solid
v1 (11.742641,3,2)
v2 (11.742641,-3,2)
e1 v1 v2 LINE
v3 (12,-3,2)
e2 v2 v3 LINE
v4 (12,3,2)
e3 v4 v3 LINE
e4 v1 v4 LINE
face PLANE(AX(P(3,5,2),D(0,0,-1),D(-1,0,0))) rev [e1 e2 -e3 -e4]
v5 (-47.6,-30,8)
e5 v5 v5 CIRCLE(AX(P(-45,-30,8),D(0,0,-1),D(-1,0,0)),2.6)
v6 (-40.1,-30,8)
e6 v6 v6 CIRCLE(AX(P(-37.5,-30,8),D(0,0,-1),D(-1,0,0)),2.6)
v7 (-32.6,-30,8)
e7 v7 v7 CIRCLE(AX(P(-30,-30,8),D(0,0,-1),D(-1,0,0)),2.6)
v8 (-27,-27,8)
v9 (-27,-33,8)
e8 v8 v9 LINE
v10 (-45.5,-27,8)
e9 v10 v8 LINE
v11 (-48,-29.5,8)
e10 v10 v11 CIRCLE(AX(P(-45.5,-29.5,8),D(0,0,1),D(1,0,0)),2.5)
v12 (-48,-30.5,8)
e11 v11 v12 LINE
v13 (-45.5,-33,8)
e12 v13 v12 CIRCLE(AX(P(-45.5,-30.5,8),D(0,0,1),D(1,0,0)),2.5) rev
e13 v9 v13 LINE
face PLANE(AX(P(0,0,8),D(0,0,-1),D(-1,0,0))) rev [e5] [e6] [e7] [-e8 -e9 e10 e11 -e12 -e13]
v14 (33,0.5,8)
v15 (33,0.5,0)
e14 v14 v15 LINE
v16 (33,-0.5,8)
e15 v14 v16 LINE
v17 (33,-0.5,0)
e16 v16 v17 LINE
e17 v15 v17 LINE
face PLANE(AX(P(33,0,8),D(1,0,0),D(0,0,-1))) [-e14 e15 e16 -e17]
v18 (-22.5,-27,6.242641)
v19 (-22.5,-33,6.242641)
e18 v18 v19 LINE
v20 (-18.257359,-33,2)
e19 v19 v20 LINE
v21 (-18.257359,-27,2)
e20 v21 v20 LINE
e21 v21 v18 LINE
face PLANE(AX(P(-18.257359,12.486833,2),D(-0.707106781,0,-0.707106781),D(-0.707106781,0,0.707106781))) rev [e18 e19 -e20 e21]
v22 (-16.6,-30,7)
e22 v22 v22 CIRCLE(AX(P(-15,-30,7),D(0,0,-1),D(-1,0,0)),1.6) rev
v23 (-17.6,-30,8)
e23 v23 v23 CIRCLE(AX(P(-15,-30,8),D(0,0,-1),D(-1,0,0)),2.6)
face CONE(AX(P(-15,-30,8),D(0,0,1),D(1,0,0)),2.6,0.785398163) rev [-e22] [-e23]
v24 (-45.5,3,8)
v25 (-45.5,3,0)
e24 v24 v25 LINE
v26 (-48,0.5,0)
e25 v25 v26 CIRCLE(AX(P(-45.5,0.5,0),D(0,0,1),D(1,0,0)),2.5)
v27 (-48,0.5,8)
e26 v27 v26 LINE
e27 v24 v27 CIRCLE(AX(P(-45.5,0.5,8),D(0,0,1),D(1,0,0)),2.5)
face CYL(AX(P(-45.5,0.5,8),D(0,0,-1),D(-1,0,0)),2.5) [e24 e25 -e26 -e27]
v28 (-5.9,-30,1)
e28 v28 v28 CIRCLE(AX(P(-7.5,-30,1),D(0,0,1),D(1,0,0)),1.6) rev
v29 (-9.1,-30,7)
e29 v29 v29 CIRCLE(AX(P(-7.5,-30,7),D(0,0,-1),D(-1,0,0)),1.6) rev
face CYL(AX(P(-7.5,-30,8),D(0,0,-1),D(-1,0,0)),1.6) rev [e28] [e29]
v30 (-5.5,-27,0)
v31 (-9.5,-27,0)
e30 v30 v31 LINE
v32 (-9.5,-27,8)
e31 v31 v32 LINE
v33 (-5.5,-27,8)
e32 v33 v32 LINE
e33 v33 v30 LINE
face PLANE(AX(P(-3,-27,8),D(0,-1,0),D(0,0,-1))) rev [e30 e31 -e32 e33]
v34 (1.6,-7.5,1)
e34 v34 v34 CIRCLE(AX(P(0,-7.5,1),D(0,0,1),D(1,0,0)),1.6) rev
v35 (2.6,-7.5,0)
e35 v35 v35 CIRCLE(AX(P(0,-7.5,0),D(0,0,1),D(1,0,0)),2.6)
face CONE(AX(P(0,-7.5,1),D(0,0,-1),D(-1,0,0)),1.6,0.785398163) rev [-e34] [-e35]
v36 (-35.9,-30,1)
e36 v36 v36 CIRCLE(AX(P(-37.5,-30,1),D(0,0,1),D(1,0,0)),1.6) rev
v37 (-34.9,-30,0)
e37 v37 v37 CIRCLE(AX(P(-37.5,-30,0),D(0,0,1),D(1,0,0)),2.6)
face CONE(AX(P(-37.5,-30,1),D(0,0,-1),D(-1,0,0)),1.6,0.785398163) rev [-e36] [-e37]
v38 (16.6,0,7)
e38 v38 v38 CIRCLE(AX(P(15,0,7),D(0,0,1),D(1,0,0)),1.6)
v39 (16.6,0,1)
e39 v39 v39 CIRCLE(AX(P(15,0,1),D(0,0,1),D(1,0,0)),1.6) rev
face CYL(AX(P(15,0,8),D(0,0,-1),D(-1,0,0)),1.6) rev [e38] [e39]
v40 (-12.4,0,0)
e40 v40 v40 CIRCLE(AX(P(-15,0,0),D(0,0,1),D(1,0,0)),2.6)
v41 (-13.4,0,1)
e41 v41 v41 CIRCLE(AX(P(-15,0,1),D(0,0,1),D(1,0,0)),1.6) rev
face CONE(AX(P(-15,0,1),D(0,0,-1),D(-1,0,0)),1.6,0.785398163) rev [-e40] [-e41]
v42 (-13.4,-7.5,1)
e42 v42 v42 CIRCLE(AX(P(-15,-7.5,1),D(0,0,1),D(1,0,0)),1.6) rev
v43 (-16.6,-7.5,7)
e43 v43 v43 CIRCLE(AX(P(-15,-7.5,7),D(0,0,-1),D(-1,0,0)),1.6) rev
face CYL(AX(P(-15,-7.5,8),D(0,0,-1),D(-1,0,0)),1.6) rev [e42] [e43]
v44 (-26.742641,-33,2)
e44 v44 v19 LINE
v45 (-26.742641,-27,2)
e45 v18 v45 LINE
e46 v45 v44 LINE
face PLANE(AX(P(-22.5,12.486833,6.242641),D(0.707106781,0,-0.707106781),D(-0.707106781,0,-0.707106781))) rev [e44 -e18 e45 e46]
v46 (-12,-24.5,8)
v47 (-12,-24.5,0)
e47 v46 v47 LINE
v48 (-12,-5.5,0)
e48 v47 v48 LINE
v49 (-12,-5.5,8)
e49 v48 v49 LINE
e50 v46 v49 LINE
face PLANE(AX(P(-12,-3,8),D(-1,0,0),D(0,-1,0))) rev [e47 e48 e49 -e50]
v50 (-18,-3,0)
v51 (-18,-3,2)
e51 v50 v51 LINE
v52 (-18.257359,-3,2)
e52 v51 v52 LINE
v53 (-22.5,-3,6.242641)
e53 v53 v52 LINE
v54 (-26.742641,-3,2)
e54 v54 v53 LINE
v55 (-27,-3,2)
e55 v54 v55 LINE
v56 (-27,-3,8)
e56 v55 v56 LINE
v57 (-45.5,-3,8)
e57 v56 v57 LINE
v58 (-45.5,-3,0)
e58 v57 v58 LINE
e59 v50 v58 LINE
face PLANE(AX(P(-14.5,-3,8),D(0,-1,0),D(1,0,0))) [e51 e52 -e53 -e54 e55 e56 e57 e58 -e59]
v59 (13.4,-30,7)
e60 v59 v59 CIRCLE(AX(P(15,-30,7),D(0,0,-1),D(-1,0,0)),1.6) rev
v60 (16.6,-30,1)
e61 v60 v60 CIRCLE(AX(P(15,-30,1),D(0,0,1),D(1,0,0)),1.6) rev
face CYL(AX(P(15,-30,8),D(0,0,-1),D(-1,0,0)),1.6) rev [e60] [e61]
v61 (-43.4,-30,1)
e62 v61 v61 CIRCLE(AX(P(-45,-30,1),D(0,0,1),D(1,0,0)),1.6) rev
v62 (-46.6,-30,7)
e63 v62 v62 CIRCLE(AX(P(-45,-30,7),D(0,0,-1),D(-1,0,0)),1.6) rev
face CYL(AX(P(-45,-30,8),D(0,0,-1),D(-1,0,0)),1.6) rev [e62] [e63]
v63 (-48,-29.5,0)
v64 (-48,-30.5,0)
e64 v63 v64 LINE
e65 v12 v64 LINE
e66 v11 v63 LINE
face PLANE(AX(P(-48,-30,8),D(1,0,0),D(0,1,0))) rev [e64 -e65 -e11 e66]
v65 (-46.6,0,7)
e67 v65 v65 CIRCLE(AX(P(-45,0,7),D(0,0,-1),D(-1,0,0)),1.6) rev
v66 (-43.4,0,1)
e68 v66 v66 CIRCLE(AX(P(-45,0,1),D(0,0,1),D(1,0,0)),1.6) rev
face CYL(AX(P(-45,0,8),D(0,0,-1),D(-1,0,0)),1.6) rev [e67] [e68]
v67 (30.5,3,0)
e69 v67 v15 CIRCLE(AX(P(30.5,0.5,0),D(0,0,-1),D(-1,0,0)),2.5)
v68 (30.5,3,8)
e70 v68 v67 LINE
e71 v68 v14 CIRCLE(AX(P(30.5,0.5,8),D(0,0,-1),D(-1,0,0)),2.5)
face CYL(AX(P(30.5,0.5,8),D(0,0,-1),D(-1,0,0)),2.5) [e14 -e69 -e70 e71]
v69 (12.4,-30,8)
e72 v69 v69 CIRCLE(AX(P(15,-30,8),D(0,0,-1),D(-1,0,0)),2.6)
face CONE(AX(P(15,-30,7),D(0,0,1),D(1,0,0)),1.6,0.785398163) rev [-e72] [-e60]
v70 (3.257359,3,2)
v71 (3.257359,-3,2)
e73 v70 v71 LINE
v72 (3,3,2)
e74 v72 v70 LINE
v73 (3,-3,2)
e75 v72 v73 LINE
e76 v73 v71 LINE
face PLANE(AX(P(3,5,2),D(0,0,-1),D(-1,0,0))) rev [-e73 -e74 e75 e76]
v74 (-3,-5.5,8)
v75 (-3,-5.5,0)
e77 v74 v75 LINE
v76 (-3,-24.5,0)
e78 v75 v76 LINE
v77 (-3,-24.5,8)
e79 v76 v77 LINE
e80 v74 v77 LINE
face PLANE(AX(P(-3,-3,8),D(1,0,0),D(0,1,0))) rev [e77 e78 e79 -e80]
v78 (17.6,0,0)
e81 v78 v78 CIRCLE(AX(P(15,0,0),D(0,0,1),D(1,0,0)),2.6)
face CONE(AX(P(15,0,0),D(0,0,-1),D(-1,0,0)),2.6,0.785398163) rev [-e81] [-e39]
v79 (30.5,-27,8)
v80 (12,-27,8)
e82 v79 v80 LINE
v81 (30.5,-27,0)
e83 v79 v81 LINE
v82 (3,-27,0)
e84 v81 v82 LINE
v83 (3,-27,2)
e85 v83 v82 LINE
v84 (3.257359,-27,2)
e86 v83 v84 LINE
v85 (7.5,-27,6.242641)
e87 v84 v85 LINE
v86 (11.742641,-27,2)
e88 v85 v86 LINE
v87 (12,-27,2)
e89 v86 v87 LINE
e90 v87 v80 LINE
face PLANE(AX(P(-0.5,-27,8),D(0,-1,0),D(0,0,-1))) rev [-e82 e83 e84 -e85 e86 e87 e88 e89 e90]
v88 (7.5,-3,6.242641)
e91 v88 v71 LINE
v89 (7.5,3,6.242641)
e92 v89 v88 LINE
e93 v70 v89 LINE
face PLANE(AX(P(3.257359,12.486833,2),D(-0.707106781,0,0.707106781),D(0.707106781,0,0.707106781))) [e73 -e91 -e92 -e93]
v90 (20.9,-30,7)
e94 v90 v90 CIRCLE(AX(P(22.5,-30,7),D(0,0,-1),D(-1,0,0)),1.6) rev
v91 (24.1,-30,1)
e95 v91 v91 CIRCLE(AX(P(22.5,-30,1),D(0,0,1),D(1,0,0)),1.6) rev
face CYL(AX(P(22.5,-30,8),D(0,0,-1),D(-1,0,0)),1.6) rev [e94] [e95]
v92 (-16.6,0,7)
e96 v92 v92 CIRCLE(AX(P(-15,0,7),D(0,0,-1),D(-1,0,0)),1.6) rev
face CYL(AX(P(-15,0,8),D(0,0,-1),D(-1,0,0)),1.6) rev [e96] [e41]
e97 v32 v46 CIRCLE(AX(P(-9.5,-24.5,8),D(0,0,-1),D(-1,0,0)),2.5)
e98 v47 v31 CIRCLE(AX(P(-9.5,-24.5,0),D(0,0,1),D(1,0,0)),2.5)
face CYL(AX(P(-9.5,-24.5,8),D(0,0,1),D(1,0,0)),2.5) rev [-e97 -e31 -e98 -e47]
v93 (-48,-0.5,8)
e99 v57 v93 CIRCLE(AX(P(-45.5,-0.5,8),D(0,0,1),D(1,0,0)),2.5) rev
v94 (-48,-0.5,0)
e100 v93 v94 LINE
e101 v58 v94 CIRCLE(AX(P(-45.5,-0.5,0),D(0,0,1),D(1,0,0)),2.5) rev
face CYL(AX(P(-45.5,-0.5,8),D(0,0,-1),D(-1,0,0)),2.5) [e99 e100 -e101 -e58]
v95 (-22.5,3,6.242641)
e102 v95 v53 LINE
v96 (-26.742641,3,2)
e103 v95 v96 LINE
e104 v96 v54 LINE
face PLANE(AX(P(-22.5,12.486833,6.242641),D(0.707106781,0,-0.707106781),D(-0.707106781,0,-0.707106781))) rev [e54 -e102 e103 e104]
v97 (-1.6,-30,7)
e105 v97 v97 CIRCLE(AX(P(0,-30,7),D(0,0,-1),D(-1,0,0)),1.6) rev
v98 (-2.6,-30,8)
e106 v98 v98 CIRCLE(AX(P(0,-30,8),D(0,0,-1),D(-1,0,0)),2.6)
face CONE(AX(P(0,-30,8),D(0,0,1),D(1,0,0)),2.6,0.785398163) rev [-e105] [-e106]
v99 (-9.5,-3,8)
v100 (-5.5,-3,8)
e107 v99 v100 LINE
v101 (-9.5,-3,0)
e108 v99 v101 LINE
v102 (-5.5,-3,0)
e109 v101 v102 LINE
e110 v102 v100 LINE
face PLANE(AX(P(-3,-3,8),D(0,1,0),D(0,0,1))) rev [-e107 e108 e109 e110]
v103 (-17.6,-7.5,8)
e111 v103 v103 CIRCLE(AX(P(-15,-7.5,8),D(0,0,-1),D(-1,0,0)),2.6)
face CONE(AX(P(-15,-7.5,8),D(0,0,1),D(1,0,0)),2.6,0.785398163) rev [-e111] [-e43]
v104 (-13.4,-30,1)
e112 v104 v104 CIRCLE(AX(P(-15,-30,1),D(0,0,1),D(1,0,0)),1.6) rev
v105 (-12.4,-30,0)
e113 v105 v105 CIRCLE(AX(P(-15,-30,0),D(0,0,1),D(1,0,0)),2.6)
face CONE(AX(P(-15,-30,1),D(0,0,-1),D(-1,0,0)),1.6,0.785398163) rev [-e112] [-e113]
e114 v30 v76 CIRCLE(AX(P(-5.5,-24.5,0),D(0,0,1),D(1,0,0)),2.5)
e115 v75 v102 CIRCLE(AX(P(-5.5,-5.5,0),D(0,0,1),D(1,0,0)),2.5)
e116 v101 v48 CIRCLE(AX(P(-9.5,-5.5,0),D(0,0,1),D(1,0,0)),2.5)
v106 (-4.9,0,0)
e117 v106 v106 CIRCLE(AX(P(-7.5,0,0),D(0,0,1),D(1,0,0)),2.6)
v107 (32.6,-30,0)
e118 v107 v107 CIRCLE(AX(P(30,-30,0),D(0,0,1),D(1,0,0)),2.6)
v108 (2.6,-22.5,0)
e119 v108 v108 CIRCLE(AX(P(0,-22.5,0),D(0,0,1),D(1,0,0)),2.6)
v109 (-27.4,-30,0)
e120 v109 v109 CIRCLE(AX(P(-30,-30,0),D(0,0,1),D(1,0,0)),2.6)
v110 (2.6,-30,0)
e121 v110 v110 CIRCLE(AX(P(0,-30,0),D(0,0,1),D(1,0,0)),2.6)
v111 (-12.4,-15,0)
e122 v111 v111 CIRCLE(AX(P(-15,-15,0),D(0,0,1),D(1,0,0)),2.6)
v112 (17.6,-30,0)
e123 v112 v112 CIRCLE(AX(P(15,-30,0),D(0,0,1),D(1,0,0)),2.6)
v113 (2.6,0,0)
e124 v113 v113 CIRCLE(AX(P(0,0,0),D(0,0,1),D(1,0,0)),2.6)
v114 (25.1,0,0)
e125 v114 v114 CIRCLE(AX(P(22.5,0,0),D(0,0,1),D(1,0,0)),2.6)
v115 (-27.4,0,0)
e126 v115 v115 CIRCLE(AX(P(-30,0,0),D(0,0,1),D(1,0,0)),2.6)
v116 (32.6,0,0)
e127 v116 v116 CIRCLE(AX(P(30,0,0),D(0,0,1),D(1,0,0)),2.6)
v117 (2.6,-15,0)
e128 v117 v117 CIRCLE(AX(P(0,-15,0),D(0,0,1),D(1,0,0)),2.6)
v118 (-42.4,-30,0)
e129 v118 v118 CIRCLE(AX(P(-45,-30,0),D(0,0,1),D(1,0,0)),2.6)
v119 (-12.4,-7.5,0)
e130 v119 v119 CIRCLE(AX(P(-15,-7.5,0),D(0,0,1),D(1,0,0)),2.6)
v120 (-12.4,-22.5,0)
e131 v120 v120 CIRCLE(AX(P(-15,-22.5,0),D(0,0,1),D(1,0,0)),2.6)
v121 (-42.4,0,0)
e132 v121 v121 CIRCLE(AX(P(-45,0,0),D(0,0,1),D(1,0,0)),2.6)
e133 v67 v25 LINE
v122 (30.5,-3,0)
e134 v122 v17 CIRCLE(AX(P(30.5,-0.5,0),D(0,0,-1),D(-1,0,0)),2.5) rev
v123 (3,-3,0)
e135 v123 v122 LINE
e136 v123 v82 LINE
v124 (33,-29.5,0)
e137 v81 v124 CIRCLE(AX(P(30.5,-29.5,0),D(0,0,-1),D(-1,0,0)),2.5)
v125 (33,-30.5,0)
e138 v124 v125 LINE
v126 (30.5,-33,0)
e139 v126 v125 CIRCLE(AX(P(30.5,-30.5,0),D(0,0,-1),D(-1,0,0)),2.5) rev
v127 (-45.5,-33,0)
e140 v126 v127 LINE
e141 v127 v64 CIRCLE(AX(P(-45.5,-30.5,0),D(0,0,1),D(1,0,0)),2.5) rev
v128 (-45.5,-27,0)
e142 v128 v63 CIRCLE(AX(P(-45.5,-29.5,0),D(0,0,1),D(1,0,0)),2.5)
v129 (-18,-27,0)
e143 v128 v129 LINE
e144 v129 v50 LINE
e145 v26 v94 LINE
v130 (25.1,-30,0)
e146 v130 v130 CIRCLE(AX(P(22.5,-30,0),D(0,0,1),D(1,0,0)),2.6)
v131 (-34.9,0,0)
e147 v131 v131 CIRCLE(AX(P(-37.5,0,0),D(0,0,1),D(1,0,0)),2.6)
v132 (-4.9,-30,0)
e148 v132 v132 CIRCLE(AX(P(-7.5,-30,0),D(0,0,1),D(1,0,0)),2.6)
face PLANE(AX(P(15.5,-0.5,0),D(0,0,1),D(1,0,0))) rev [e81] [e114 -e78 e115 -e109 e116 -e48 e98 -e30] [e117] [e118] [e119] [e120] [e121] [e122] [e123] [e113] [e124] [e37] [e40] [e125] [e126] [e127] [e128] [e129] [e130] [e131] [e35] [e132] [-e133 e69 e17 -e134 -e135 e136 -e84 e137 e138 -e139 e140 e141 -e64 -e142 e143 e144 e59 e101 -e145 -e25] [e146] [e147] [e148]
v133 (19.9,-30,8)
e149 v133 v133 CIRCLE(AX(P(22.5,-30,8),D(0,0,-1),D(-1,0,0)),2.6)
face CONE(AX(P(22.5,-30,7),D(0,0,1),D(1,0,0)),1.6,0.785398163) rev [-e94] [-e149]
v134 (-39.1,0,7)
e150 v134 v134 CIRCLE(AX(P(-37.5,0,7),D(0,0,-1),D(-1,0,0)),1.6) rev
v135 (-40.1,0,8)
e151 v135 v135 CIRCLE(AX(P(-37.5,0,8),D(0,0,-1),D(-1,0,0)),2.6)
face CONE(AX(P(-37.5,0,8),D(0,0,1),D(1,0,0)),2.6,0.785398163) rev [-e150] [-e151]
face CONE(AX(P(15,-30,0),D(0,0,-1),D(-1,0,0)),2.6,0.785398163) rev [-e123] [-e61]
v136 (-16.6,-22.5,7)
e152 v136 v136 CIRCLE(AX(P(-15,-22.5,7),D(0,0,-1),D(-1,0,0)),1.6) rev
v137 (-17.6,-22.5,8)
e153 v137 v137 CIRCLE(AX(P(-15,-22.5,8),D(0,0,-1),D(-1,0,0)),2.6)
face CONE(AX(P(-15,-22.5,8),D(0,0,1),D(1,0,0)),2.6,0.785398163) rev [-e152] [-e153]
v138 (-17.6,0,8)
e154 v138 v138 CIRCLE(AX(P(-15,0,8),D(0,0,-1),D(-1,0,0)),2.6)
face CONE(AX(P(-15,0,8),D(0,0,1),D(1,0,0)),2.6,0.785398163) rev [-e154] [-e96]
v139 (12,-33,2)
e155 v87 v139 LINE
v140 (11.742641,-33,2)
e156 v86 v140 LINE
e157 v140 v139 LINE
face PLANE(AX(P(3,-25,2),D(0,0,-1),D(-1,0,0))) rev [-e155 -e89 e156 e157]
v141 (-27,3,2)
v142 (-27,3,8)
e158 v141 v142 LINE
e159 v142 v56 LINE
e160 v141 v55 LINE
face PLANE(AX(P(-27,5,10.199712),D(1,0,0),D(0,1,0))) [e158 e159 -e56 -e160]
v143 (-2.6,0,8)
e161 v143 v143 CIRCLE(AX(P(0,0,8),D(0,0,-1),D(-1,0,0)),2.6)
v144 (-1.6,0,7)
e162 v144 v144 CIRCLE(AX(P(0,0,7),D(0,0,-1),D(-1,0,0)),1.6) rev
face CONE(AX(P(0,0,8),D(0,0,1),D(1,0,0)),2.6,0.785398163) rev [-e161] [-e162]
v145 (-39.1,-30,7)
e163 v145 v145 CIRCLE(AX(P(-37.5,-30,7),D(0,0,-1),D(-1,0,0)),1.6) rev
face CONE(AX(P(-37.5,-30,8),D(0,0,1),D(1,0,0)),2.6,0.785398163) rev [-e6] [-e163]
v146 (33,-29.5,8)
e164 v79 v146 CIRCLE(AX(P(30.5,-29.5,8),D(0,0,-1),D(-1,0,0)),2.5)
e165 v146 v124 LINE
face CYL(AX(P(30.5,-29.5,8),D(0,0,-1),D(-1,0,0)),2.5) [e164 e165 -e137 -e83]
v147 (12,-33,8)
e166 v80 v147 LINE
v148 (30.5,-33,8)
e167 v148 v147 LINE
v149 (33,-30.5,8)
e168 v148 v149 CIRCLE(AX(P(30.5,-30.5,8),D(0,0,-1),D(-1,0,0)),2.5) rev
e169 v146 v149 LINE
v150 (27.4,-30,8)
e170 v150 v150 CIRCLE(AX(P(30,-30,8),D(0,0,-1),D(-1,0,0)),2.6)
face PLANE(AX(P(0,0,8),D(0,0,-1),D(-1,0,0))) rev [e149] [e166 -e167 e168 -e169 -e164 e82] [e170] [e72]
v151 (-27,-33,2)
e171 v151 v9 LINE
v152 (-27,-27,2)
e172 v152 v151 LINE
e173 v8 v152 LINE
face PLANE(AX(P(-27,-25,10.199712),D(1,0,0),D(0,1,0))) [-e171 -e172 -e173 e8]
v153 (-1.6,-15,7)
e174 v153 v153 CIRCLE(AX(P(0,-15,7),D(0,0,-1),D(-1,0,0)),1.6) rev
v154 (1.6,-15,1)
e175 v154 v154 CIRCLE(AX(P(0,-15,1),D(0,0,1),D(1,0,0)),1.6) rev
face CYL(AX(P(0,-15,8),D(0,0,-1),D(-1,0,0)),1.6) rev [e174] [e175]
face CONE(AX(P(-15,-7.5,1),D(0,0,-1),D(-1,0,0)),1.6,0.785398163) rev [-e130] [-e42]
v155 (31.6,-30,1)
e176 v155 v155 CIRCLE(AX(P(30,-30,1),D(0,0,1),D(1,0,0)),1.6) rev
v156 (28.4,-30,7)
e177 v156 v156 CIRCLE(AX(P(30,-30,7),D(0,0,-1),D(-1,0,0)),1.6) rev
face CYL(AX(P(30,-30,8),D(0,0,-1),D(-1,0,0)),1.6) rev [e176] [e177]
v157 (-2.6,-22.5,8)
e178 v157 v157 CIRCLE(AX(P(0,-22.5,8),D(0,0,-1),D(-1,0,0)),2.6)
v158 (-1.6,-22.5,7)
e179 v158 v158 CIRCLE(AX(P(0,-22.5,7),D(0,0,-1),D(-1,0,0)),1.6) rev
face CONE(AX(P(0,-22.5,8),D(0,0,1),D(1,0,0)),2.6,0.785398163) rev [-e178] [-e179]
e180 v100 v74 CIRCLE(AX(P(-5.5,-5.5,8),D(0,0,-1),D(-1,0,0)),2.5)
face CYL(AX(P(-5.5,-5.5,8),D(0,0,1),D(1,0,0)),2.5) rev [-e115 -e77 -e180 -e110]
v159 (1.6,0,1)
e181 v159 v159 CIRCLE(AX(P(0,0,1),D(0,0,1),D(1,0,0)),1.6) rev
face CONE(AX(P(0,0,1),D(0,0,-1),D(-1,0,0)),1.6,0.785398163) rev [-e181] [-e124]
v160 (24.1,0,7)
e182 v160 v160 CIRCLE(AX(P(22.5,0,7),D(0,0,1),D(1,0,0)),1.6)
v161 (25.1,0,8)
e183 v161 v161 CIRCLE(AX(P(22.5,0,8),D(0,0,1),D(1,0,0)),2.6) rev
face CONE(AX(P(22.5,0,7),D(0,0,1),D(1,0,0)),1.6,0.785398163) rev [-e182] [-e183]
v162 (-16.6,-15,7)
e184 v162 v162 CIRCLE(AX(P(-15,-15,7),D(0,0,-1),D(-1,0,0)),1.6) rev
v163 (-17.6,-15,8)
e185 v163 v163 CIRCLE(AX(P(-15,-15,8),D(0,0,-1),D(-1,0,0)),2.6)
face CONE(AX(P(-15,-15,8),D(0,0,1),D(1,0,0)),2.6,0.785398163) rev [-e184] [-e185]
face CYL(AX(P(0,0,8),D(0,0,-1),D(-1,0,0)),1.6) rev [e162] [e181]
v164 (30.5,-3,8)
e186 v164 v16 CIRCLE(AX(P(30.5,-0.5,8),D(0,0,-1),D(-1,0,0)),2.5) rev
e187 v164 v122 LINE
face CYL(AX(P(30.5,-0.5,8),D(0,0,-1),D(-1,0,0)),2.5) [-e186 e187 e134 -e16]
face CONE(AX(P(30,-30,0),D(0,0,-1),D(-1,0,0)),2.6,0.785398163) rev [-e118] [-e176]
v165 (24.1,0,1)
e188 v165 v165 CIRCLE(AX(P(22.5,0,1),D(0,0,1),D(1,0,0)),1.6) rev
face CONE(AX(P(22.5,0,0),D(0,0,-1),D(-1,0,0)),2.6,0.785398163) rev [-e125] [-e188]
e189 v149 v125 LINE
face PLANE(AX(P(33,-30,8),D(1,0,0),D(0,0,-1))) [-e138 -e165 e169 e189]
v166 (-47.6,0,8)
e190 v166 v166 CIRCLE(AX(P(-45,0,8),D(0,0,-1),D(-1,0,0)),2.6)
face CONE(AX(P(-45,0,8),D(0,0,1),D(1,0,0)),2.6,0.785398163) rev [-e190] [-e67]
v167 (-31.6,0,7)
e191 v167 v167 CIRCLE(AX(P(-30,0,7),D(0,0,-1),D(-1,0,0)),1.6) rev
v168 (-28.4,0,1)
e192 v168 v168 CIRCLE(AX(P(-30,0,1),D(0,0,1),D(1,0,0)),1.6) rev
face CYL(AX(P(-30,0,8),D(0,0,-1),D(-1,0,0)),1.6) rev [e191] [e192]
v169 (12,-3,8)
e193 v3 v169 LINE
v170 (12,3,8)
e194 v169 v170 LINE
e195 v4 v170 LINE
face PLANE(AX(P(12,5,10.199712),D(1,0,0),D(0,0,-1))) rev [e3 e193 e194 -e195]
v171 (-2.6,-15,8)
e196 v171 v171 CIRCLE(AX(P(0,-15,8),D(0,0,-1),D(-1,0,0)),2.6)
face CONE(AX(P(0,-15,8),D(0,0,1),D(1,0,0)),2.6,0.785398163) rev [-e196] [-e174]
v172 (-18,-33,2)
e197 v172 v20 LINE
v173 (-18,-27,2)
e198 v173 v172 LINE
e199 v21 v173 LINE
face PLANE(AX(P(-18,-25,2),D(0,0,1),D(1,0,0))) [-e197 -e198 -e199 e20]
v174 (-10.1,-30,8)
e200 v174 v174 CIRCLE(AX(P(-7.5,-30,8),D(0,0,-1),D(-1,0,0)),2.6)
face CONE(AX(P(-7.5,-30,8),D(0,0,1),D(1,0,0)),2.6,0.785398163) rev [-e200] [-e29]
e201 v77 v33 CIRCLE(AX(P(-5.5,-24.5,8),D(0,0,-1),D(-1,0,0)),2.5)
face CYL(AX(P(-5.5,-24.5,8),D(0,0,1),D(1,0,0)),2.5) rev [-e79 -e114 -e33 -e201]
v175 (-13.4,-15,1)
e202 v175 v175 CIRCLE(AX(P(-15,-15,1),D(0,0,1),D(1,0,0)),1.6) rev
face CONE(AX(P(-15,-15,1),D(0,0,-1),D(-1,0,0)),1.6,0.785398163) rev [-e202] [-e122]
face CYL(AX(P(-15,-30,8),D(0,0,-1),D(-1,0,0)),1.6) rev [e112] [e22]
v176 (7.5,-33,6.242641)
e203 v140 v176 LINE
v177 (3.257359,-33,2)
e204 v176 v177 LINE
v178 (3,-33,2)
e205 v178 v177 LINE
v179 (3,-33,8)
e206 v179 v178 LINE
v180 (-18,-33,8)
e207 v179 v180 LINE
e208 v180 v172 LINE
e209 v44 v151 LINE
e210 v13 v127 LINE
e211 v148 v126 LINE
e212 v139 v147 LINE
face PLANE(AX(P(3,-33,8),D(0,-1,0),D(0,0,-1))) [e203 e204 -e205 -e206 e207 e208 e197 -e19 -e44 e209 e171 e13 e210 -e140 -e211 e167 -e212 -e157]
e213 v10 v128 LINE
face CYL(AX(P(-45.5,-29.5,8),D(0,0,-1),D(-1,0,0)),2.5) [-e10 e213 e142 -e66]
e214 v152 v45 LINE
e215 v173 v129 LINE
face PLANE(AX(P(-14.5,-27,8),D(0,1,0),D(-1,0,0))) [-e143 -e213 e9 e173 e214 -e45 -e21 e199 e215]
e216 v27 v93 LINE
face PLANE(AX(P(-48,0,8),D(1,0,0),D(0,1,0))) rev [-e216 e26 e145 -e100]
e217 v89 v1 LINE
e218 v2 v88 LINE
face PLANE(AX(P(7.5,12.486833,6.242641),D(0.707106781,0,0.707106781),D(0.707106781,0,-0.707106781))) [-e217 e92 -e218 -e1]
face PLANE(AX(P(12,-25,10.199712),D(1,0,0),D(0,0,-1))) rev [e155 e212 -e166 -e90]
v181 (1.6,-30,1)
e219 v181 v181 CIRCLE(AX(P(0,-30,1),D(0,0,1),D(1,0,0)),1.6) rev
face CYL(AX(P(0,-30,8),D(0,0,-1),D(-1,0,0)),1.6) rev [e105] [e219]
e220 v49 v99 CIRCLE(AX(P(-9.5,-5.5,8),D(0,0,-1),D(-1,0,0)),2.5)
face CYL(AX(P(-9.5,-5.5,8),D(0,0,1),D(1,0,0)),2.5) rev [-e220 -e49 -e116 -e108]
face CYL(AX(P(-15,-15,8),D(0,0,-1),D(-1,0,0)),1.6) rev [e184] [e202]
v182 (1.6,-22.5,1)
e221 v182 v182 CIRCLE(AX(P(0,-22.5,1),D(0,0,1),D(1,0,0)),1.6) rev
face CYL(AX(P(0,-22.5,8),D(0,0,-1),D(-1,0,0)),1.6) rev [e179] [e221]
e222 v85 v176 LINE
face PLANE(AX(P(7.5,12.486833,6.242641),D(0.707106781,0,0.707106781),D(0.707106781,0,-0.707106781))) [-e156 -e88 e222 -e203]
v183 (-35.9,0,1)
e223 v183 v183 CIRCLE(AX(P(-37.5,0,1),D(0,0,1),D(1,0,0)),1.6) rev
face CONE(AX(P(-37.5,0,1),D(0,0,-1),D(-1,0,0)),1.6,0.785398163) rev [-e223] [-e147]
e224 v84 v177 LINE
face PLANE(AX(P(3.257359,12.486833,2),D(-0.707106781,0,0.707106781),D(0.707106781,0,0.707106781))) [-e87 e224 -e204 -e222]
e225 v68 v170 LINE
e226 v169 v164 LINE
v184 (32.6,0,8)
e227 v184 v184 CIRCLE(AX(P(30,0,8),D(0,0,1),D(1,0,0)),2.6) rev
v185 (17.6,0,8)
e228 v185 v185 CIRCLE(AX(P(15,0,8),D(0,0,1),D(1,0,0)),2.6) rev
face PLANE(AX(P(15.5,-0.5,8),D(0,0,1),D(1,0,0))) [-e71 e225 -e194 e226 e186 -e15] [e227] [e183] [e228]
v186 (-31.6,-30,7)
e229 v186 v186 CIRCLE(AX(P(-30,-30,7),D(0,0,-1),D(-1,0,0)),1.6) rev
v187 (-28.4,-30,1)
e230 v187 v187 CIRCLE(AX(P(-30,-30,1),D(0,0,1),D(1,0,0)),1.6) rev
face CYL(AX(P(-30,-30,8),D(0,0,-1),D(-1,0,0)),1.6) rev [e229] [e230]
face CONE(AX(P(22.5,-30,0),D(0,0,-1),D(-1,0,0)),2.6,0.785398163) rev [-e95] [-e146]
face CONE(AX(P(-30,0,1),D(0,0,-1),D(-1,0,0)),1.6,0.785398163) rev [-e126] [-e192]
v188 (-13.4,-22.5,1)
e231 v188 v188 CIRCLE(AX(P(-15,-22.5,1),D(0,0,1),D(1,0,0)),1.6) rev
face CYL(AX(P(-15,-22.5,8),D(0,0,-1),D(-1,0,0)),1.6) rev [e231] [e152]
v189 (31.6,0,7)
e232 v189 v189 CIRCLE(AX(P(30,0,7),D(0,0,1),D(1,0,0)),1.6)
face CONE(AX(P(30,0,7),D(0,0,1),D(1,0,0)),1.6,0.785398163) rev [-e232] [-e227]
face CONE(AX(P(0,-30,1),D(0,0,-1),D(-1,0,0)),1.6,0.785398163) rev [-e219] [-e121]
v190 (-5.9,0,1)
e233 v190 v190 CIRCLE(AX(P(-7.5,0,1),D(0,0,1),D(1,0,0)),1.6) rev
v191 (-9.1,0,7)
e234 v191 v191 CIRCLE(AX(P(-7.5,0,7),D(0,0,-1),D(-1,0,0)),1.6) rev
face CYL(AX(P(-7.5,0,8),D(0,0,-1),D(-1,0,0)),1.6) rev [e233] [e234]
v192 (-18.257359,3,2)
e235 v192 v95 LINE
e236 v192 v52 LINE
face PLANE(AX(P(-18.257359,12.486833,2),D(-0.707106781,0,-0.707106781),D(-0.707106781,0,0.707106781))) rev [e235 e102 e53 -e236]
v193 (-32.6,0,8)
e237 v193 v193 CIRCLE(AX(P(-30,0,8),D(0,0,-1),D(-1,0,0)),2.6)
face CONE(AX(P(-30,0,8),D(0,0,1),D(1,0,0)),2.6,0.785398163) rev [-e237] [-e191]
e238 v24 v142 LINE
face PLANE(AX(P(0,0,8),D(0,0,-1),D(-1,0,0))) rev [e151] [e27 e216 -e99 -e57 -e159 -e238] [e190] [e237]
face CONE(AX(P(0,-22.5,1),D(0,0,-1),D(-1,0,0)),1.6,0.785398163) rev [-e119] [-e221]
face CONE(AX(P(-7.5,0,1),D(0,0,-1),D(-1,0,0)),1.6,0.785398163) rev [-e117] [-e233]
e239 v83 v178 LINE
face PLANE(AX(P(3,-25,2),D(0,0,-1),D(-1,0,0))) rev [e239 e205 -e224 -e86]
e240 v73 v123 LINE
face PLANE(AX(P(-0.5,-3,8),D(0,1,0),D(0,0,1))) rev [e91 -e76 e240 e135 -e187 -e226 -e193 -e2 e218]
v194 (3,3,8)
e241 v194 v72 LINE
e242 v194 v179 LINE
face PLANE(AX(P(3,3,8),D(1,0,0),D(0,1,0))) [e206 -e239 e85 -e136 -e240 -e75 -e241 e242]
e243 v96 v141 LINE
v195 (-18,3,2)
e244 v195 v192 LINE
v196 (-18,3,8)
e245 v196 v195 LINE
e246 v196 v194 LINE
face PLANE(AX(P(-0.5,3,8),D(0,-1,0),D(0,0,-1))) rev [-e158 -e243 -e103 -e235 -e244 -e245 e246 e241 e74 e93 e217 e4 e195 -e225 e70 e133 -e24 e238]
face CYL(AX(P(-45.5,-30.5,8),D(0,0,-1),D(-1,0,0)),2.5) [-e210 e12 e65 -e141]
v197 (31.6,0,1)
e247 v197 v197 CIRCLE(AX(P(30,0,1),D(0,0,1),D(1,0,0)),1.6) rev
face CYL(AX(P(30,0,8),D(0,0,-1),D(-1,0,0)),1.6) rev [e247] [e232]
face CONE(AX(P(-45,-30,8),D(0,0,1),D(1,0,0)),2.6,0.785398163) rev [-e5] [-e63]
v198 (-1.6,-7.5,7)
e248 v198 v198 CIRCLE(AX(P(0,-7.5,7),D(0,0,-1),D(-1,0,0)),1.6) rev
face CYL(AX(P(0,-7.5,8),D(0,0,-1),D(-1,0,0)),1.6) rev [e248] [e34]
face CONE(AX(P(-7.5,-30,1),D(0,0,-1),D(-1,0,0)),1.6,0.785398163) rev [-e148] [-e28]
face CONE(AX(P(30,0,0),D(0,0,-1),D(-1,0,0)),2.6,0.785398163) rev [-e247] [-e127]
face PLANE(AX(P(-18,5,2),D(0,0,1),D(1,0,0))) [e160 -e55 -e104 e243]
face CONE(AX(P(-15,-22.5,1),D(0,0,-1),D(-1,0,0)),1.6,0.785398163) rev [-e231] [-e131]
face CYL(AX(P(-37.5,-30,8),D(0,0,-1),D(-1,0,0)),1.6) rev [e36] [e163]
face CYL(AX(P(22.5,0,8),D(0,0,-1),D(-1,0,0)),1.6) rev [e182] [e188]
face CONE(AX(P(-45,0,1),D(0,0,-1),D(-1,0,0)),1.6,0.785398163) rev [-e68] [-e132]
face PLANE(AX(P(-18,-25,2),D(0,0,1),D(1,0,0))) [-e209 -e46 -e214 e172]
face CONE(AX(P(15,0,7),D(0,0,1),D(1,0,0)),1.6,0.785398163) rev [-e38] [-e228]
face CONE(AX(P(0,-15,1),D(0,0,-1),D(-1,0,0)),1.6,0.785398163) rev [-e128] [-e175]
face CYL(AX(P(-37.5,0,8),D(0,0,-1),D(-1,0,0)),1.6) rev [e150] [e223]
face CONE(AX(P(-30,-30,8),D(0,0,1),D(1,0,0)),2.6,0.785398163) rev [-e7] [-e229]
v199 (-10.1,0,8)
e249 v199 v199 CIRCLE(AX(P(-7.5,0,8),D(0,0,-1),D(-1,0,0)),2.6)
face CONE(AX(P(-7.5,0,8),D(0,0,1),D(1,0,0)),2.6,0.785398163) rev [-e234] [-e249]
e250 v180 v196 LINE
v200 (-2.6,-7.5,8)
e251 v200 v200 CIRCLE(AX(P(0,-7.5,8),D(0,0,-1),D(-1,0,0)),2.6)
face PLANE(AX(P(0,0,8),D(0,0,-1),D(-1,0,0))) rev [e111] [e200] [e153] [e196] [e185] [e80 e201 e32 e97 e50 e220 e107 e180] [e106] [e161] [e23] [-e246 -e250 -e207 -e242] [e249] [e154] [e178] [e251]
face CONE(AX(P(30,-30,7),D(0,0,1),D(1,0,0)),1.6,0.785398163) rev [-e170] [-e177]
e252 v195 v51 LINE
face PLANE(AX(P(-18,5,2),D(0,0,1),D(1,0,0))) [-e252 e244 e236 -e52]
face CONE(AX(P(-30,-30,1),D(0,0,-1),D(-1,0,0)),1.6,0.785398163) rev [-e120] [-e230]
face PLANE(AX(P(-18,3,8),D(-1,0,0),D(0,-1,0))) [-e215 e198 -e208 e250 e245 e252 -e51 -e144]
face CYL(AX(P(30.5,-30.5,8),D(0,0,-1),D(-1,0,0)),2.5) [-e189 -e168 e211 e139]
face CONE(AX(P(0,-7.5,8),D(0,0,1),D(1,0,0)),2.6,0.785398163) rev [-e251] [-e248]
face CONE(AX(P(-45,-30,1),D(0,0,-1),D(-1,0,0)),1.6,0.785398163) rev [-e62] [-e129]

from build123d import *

# Parameters (mm, degrees)
SKETCH1_R             = 1.6
BOSS_EXTRUDE1_DEPTH   = 8
SKETCH2_W             = 9
SKETCH2_H             = 8.199711987
CUT_EXTRUDE1_DEPTH    = 8
BOSS_EXTRUDE2_DEPTH   = 6
SKETCH4_R             = 1.6
BOSS_EXTRUDE3_DEPTH   = 8
SKETCH5_W             = 24.599859369
SKETCH5_H             = 11.841190876
CUT_EXTRUDE2_DEPTH    = 10
SKETCH6_W             = 21
SKETCH6_H             = 36
SKETCH6_R             = 1.6
SKETCH6_W_2           = 9
SKETCH6_H_2           = 24
BOSS_EXTRUDE4_DEPTH   = 8
LPATTERN1_OUTLINE_R   = 1.6
LPATTERN1_DEPTH       = 8
LPATTERN1_2_OUTLINE_W = 9
LPATTERN1_2_OUTLINE_H = 6
LPATTERN1_2_DEPTH     = 2
LPATTERN1_START       = -33
LPATTERN1_3_DEPTH     = 6
FILLET1_R             = 2.5
CHAMFER1_SIZE         = 1


with BuildPart() as part:
    # Sketch1 → Boss-Extrude1 (new body)
    with BuildSketch(Plane.XY):
        with BuildLine():
            Line((-0.5, 3), (15.5, 3))
            ThreePointArc((15.5, 3), (17.267766953, 2.267766953), (18, 0.5))
            Line((18, 0.5), (18, -0.5))
            ThreePointArc((18, -0.5), (17.267766953, -2.267766953), (15.5, -3))
            Line((15.5, -3), (-0.5, -3))
            ThreePointArc((-0.5, -3), (-2.267766953, -2.267766953), (-3, -0.5))
            Line((-3, -0.5), (-3, 0.5))
            ThreePointArc((-3, 0.5), (-2.267766953, 2.267766953), (-0.5, 3))
        make_face()
        Circle(SKETCH1_R, mode=Mode.SUBTRACT)
        with Locations((15, 0)):
            Circle(SKETCH1_R, mode=Mode.SUBTRACT)
    boss_extrude1 = extrude(amount=BOSS_EXTRUDE1_DEPTH)

    # Sketch2 → Cut-Extrude1 (cut)
    with BuildSketch(Plane.XZ.offset(3)):
        with Locations((7.5, 6.099855994)):
            Rectangle(SKETCH2_W, SKETCH2_H)
    cut_extrude1 = extrude(amount=-CUT_EXTRUDE1_DEPTH, mode=Mode.SUBTRACT)

    # Sketch3 → Boss-Extrude2 (add)
    with BuildSketch(Plane.XZ.offset(3)):
        Polygon((3.257359313, 2), (7.5, 6.242640687), (11.742640687, 2), align=None)
    boss_extrude2 = extrude(amount=-BOSS_EXTRUDE2_DEPTH)

    # Sketch4 → Boss-Extrude3 (add)
    # profile 1 of 2: a face of its own
    with BuildSketch(Plane(origin=(0, 0, 0), x_dir=(-1, 0, 0), z_dir=(0, 0, -1))):
        with BuildLine():
            Line((15.5, 3), (0.5, 3))
            ThreePointArc((0.5, 3), (2.267766953, 2.267766953), (3, 0.5))
            Line((3, 0.5), (3, -0.5))
            ThreePointArc((3, -0.5), (2.267766953, -2.267766953), (0.5, -3))
            Line((0.5, -3), (15.5, -3))
            ThreePointArc((15.5, -3), (17.267766953, -2.267766953), (18, -0.5))
            Line((18, -0.5), (18, 0.5))
            ThreePointArc((18, 0.5), (17.267766953, 2.267766953), (15.5, 3))
        make_face()
        with Locations((7.5, 0)):
            Circle(SKETCH4_R, mode=Mode.SUBTRACT)
        with Locations((15, 0)):
            Circle(SKETCH4_R, mode=Mode.SUBTRACT)
    # profile 2 of 2: a face of its own
    with BuildSketch(Plane(origin=(0, 0, 0), x_dir=(-1, 0, 0), z_dir=(0, 0, -1))):
        with BuildLine():
            ThreePointArc((-18, 0.5), (-17.267766953, 2.267766953), (-15.5, 3))
            Line((-15.5, 3), (-30.5, 3))
            ThreePointArc((-30.5, 3), (-32.267766953, 2.267766953), (-33, 0.5))
            Line((-33, 0.5), (-33, -0.5))
            ThreePointArc((-33, -0.5), (-32.267766953, -2.267766953), (-30.5, -3))
            Line((-30.5, -3), (-15.5, -3))
            ThreePointArc((-15.5, -3), (-17.267766953, -2.267766953), (-18, -0.5))
            Line((-18, -0.5), (-18, 0.5))
        make_face()
        with Locations((-30, 0)):
            Circle(SKETCH4_R, mode=Mode.SUBTRACT)
        with Locations((-22.5, 0)):
            Circle(SKETCH4_R, mode=Mode.SUBTRACT)
    boss_extrude3 = extrude(amount=-BOSS_EXTRUDE3_DEPTH)

    # Sketch5 → Cut-Extrude2 (cut)
    with BuildSketch(Plane.XY.offset(8)):
        with Locations((-9.299929685, -2.920595438)):
            Rectangle(SKETCH5_W, SKETCH5_H)
    extrude(amount=-CUT_EXTRUDE2_DEPTH, mode=Mode.SUBTRACT)

    # Sketch6 → Boss-Extrude4 (add)
    with BuildSketch(Plane(origin=(0, 0, 0), x_dir=(-1, 0, 0), z_dir=(0, 0, -1))):
        with Locations((7.5, -15)):
            Rectangle(SKETCH6_W, SKETCH6_H)
        Circle(SKETCH6_R, mode=Mode.SUBTRACT)
        with Locations((7.5, 0)):
            Circle(SKETCH6_R, mode=Mode.SUBTRACT)
        with Locations((15, 0)):
            Circle(SKETCH6_R, mode=Mode.SUBTRACT)
        with Locations((0, -7.5)):
            Circle(SKETCH6_R, mode=Mode.SUBTRACT)
        with Locations((0, -15)):
            Circle(SKETCH6_R, mode=Mode.SUBTRACT)
        with Locations((0, -22.5)):
            Circle(SKETCH6_R, mode=Mode.SUBTRACT)
        with Locations((0, -30)):
            Circle(SKETCH6_R, mode=Mode.SUBTRACT)
        with Locations(Location((15, -30, 0), (0, 0, 180))):
            Circle(SKETCH6_R, mode=Mode.SUBTRACT)
        with Locations(Location((7.5, -30, 0), (0, 0, 180))):
            Circle(SKETCH6_R, mode=Mode.SUBTRACT)
        with Locations(Location((15, -22.5, 0), (0, 0, 180))):
            Circle(SKETCH6_R, mode=Mode.SUBTRACT)
        with Locations(Location((15, -15, 0), (0, 0, 180))):
            Circle(SKETCH6_R, mode=Mode.SUBTRACT)
        with Locations(Location((15, -7.5, 0), (0, 0, 180))):
            Circle(SKETCH6_R, mode=Mode.SUBTRACT)
        with Locations((7.5, -15)):
            Rectangle(SKETCH6_W_2, SKETCH6_H_2, mode=Mode.SUBTRACT)
    boss_extrude4 = extrude(amount=-BOSS_EXTRUDE4_DEPTH)



with BuildPart() as body_2:
    # LPattern1: read off the stored shape, not the designer's step
    # LPattern1 outline → LPattern1 (new body)
    with BuildSketch(Plane.XY):
        with BuildLine():
            Line((12, -27), (12, -33))
            Line((12, -33), (30.5, -33))
            ThreePointArc((30.5, -33), (32.267766953, -32.267766953), (33, -30.5))
            Line((33, -30.5), (33, -29.5))
            ThreePointArc((33, -29.5), (32.267766953, -27.732233047), (30.5, -27))
            Line((30.5, -27), (12, -27))
        make_face()
        with Locations((15, -30)):
            Circle(LPATTERN1_OUTLINE_R, mode=Mode.SUBTRACT)
        with Locations((22.5, -30)):
            Circle(LPATTERN1_OUTLINE_R, mode=Mode.SUBTRACT)
        with Locations((30, -30)):
            Circle(LPATTERN1_OUTLINE_R, mode=Mode.SUBTRACT)
    lpattern1 = extrude(amount=LPATTERN1_DEPTH)


with BuildPart() as part_1:
    add(part.part)

    add(body_2.part)  # LPattern1 2 merges body 2
    # LPattern1 2 outline → LPattern1 2 (add)
    with BuildSketch(Plane.XY):
        with Locations((7.5, -30)):
            Rectangle(LPATTERN1_2_OUTLINE_W, LPATTERN1_2_OUTLINE_H)
    lpattern1_2 = extrude(amount=LPATTERN1_2_DEPTH)

    # LPattern1 3 outline → LPattern1 3 (add)
    with BuildSketch(Plane(origin=(0, 0, 0), x_dir=(1, 0, 0), z_dir=(0, 1, 0)).offset(LPATTERN1_START)):
        Polygon((11.742640687, -2), (3.257359313, -2), (7.5, -6.242640687), align=None)
    lpattern1_3 = extrude(amount=LPATTERN1_3_DEPTH)

    # Mirror1: Boss-Extrude1, Cut-Extrude1, Boss-Extrude2, Boss-Extrude3, Boss-Extrude4, LPattern1, LPattern1 2, LPattern1 3 across plane
    add(boss_extrude1.mirror(Plane.ZY.offset(7.5)))
    add(cut_extrude1.mirror(Plane.ZY.offset(7.5)), mode=Mode.SUBTRACT)
    add(boss_extrude2.mirror(Plane.ZY.offset(7.5)))
    add(boss_extrude3.mirror(Plane.ZY.offset(7.5)))
    add(boss_extrude4.mirror(Plane.ZY.offset(7.5)))
    add(lpattern1.mirror(Plane.ZY.offset(7.5)))
    add(lpattern1_2.mirror(Plane.ZY.offset(7.5)))
    add(lpattern1_3.mirror(Plane.ZY.offset(7.5)))

    # Fillet1
    fillet1_edges = [part_1.edges().sort_by_distance(p)[0] for p in [
        (-12, -3, 4),
        (-12, -27, 4),
        (-3, -27, 4),
        (-3, -3, 4),
    ]]
    fillet(fillet1_edges, radius=FILLET1_R)

    # Chamfer1
    chamfer1_edges = [part_1.edges().sort_by_distance(p)[0] for p in [
        (-16.6, -7.5, 8),
        (-16.6, -15, 8),
        (-16.6, -22.5, 8),
        (-9.1, -30, 8),
        (-16.6, -30, 8),
        (1.6, -30, 8),
        (1.6, -22.5, 8),
        (1.6, -15, 8),
        (1.6, -7.5, 8),
        (-13.4, 0, 8),
        (-5.9, 0, 8),
        (1.6, 0, 8),
        (1.6, 0, 0),
        (-5.9, 0, 0),
        (-13.4, 0, 0),
        (1.6, -7.5, 0),
        (1.6, -15, 0),
        (1.6, -22.5, 0),
        (1.6, -30, 0),
        (-16.6, -30, 0),
        (-9.1, -30, 0),
        (-16.6, -22.5, 0),
        (-16.6, -15, 0),
        (-16.6, -7.5, 0),
        (13.4, 0, 0),
        (13.4, 0, 8),
        (13.4, -30, 0),
        (13.4, -30, 8),
        (28.4, -30, 8),
        (20.9, -30, 8),
        (28.4, -30, 0),
        (20.9, -30, 0),
        (-28.4, 0, 8),
        (-28.4, 0, 0),
        (-46.6, 0, 0),
        (-39.1, 0, 0),
        (-46.6, 0, 8),
        (-39.1, 0, 8),
        (-28.4, -30, 8),
        (-28.4, -30, 0),
        (-43.4, -30, 0),
        (-35.9, -30, 0),
        (-43.4, -30, 8),
        (-35.9, -30, 8),
        (31.6, 0, 8),
        (24.1, 0, 8),
        (31.6, 0, 0),
        (24.1, 0, 0),
    ]]
    chamfer(chamfer1_edges, length=CHAMFER1_SIZE)


solid = part_1.part
